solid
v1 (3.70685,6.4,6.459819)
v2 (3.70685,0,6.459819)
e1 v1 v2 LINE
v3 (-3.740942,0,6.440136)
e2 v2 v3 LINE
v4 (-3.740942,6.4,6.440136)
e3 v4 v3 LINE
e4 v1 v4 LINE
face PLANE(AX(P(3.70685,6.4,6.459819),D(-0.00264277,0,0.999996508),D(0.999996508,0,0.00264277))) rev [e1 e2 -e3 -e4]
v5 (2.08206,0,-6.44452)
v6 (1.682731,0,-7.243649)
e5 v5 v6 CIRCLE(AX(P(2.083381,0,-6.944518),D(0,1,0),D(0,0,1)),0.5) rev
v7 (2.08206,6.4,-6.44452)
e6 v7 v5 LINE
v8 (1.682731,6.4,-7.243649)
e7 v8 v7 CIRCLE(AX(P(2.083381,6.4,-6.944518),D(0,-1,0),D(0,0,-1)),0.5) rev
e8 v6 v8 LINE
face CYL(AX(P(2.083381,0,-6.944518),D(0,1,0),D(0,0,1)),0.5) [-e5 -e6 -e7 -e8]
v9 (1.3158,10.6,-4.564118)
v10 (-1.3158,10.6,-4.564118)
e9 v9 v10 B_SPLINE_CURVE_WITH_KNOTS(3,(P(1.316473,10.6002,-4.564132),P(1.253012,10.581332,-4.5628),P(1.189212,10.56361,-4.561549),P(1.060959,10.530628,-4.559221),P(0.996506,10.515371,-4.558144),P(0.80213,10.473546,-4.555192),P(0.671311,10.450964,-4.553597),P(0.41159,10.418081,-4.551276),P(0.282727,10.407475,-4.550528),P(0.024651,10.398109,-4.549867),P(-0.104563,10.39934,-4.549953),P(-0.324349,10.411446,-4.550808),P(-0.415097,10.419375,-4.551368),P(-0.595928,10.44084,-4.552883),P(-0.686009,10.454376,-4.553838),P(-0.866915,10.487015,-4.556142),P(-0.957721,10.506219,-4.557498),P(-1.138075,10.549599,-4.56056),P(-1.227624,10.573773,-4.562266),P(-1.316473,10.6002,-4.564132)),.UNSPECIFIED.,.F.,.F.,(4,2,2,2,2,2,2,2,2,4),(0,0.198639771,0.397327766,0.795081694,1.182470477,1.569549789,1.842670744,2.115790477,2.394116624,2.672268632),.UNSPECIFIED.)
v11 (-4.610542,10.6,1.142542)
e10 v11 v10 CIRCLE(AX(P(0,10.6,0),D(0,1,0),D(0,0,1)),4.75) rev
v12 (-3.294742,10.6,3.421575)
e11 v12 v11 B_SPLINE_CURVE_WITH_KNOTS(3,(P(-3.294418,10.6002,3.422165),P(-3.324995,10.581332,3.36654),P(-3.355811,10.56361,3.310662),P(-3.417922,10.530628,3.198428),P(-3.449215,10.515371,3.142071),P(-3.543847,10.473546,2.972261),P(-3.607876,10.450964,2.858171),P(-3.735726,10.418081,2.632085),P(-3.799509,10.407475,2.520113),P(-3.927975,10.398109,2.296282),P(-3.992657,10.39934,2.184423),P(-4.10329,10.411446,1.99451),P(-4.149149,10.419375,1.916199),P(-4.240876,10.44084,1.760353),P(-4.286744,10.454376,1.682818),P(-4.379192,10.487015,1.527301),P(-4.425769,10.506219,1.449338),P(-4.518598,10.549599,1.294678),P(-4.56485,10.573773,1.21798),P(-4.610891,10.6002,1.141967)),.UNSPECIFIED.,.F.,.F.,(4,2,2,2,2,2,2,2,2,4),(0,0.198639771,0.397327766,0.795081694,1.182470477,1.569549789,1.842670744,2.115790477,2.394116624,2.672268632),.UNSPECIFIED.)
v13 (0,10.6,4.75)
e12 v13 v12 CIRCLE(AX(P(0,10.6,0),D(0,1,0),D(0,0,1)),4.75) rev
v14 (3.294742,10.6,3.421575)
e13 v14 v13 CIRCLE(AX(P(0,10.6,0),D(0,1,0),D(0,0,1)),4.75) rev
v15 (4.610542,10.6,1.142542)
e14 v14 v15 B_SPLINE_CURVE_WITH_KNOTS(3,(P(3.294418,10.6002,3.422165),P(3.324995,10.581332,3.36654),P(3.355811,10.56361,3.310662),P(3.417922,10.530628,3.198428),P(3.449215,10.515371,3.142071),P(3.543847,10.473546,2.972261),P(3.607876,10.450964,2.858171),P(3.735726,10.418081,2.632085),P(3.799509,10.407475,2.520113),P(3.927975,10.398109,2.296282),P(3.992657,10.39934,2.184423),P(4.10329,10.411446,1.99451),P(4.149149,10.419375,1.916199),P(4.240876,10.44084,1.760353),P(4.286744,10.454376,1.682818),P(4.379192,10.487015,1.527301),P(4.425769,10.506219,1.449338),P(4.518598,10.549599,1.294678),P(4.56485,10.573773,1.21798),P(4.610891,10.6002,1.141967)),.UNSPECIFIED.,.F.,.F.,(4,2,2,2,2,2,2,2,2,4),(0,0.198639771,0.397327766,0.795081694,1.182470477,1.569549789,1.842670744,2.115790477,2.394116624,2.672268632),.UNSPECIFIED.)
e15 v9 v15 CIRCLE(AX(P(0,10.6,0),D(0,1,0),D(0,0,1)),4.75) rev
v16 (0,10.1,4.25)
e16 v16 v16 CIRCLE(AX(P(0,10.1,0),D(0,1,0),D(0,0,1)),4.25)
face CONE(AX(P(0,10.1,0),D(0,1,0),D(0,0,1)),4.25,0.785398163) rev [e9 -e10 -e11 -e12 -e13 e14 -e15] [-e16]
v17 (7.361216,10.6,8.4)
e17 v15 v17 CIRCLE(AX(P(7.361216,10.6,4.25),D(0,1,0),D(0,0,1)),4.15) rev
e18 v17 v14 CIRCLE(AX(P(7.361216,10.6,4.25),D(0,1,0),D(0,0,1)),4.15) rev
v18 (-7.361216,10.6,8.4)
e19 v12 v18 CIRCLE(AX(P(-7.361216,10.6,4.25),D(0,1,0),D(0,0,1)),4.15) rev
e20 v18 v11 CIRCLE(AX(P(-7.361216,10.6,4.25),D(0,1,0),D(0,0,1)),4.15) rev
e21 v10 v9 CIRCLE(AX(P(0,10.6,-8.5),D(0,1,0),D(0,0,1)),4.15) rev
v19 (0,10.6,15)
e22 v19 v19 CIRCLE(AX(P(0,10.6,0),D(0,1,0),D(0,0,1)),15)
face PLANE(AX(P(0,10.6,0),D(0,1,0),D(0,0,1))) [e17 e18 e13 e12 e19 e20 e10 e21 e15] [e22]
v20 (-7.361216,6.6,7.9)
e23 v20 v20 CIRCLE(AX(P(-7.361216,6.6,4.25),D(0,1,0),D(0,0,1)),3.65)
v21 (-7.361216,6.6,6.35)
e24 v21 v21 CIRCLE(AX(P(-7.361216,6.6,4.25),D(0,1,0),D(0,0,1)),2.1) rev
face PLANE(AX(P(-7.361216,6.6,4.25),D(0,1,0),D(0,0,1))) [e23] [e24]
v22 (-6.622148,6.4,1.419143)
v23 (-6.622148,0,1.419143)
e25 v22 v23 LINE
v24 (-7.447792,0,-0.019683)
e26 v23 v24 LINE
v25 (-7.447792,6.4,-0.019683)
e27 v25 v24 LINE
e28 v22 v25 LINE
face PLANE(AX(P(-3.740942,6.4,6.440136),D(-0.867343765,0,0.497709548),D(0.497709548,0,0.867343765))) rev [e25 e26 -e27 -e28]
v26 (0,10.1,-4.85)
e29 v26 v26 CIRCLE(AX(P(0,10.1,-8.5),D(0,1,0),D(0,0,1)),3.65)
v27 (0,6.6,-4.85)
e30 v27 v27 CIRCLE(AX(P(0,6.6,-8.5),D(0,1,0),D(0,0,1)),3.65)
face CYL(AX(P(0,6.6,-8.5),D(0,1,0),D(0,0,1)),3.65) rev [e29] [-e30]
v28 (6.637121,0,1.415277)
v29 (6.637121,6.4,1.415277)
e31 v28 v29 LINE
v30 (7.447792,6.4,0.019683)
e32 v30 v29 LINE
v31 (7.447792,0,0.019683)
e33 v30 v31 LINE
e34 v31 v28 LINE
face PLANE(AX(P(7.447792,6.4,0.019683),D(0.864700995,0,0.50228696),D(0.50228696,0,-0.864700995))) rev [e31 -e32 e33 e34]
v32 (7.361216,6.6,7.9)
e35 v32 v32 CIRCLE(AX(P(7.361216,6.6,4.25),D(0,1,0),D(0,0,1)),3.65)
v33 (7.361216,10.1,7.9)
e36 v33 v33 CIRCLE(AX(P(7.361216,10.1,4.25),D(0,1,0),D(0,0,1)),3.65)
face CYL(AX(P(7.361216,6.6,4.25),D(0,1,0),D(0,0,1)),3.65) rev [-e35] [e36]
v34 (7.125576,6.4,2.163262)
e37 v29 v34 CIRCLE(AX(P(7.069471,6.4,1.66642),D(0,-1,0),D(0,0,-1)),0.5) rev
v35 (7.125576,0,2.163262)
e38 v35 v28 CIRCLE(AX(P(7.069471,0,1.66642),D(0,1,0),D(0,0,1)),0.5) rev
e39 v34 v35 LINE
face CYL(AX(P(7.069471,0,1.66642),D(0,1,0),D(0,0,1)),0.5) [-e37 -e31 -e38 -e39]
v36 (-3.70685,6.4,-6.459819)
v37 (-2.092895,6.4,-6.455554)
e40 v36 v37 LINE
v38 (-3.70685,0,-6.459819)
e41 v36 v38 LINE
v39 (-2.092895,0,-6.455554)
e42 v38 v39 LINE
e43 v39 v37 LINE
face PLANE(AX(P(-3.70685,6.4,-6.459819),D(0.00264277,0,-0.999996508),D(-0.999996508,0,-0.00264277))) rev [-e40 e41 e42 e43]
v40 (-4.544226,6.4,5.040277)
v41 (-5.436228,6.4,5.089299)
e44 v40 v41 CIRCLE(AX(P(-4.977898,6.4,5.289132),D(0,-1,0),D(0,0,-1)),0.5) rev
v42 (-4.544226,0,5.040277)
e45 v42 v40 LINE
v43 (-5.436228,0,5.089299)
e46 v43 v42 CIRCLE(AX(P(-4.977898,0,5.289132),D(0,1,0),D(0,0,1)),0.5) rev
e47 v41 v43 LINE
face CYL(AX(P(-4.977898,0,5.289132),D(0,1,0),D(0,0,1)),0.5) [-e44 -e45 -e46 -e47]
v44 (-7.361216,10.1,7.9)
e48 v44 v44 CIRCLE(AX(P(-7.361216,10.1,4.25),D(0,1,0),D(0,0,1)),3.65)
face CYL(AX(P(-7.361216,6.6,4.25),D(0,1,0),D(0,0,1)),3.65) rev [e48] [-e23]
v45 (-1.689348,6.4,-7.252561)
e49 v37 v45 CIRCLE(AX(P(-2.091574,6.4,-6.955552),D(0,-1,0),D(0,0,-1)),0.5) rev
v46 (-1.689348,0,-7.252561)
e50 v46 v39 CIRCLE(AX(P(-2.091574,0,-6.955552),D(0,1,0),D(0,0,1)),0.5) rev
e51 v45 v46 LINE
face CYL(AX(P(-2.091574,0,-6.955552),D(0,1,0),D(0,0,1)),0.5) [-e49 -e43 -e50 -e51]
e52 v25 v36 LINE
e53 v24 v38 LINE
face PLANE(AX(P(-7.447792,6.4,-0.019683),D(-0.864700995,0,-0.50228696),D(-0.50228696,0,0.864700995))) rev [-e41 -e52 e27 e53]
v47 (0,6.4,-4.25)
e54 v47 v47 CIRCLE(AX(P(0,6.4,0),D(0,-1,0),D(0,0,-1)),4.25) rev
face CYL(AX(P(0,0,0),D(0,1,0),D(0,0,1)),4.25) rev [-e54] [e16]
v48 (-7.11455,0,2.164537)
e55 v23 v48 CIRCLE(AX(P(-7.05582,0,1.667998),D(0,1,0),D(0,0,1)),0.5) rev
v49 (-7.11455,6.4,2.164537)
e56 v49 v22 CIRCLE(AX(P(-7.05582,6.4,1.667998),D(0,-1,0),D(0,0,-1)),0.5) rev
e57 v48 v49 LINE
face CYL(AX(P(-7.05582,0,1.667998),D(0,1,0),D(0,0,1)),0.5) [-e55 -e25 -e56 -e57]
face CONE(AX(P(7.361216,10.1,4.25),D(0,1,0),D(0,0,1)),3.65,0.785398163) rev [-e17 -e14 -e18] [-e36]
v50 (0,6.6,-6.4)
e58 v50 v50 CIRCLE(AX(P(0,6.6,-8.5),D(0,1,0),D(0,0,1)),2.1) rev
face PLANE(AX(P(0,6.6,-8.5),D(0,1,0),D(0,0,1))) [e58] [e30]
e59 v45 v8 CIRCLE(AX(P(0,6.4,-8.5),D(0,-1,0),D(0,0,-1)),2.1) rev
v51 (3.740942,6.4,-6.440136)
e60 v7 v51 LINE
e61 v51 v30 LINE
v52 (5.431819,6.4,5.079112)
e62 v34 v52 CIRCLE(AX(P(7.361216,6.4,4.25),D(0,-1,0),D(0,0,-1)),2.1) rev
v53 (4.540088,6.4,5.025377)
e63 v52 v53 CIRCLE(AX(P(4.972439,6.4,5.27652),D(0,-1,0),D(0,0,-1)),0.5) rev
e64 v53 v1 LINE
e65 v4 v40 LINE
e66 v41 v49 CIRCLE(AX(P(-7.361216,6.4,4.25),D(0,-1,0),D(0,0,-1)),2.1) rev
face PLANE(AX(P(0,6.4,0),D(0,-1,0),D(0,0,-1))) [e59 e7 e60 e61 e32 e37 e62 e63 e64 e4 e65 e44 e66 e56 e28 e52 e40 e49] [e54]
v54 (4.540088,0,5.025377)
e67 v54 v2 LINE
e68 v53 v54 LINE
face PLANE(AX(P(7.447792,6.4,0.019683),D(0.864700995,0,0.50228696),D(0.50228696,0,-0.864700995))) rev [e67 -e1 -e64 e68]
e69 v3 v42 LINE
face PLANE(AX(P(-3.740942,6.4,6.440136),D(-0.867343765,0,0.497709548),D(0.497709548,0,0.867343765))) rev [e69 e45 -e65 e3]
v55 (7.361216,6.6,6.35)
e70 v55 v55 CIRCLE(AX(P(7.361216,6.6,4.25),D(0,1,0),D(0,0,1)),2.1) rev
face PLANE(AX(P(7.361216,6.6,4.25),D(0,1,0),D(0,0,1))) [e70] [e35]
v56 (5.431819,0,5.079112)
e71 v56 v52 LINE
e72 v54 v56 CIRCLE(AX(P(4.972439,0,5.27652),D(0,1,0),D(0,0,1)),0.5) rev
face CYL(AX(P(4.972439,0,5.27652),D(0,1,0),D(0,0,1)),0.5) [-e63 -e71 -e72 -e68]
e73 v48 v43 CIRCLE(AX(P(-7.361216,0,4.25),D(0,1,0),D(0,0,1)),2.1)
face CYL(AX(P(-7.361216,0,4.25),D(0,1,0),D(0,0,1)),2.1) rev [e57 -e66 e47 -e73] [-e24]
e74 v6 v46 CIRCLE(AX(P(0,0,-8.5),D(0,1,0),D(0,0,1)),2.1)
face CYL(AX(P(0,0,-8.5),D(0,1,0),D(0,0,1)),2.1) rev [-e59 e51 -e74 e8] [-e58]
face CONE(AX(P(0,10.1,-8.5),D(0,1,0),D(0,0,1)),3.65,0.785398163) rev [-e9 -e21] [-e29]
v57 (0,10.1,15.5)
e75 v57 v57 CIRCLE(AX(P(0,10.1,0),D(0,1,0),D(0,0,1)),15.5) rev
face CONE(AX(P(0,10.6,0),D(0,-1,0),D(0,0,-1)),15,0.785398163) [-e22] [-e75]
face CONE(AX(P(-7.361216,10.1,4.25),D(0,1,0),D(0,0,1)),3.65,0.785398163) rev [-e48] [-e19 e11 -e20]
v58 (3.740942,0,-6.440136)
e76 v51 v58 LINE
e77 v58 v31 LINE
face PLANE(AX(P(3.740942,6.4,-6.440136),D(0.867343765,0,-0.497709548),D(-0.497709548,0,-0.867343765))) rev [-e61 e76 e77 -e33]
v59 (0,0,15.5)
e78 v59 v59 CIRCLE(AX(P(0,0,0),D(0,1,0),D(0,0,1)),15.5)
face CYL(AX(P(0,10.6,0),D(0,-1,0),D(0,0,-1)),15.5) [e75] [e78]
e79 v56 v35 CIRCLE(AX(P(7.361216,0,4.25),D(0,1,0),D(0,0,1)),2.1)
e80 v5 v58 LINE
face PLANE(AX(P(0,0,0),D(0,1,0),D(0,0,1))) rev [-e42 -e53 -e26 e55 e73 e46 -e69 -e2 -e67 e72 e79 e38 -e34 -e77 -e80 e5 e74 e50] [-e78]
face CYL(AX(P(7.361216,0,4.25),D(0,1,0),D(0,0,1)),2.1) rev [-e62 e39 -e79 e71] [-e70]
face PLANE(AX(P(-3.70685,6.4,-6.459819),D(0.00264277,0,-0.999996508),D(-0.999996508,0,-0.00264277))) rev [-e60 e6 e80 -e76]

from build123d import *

# Parameters (mm, degrees)
SKETCH1_R           = 15.5
BOSS_EXTRUDE1_DEPTH = 10.6
SKETCH2_R           = 2.1
CUT_EXTRUDE1_DEPTH  = 25.348716599
SKETCH3_R           = 4.25
CUT_EXTRUDE2_DEPTH  = 25.348716599
CUT_EXTRUDE3_DEPTH  = 6.4
SKETCH5_R           = 3.65
CUT_EXTRUDE4_DEPTH  = 4
CHAMFER1_SIZE       = 0.5
FILLET_1_R          = 0.5


with BuildPart() as part:
    # Sketch1 → Boss-Extrude1 (new body)
    with BuildSketch(Plane(origin=(0, 0, 0), x_dir=(1, 0, 0), z_dir=(0, 1, 0))):
        with Locations(Location((0, 0, 0), (0, 0, 270))):
            Circle(SKETCH1_R)
    extrude(amount=BOSS_EXTRUDE1_DEPTH)

    # Sketch2 → Cut-Extrude1 (cut, through all)
    with BuildSketch(Plane(origin=(0, 10.6, 0), x_dir=(1, 0, 0), z_dir=(0, 1, 0))):
        with Locations(Location((0, 8.5, 0), (0, 0, 270))):
            Circle(SKETCH2_R)
        with Locations(Location((7.361215932, -4.25, 0), (0, 0, 270))):
            Circle(SKETCH2_R)
        with Locations(Location((-7.361215932, -4.25, 0), (0, 0, 270))):
            Circle(SKETCH2_R)
    extrude(amount=-CUT_EXTRUDE1_DEPTH, mode=Mode.SUBTRACT)

    # Sketch3 → Cut-Extrude2 (cut, through all)
    with BuildSketch(Plane(origin=(0, 10.6, 0), x_dir=(1, 0, 0), z_dir=(0, 1, 0))):
        with Locations(Location((0, 0, 0), (0, 0, 270))):
            Circle(SKETCH3_R)
    extrude(amount=-CUT_EXTRUDE2_DEPTH, mode=Mode.SUBTRACT)

    # Sketch4 → Cut-Extrude3 (cut)
    with BuildSketch(Plane.XZ):
        Polygon((3.740942098, -6.44013604), (7.447792464, 0.019682871), (3.706850366, 6.459818911), (-3.740942098, 6.44013604), (-7.447792464, -0.019682871), (-3.706850366, -6.459818911), align=None)
    extrude(amount=-CUT_EXTRUDE3_DEPTH, mode=Mode.SUBTRACT)

    # Sketch5 → Cut-Extrude4 (cut)
    with BuildSketch(Plane(origin=(0, 10.6, 0), x_dir=(1, 0, 0), z_dir=(0, 1, 0))):
        with Locations(Location((0, 8.5, 0), (0, 0, 270))):
            Circle(SKETCH5_R)
        with Locations(Location((7.361215932, -4.25, 0), (0, 0, 270))):
            Circle(SKETCH5_R)
        with Locations(Location((-7.361215932, -4.25, 0), (0, 0, 270))):
            Circle(SKETCH5_R)
    extrude(amount=-CUT_EXTRUDE4_DEPTH, mode=Mode.SUBTRACT)

    # Chamfer1
    # the kernel refuses this chamfer: 0.5 mm, written as the material it takes off along each edge
    with BuildSketch(Plane(origin=(0, 10.6, 0), x_dir=(0, 0, 1), z_dir=(-1, 0, 0))) as chamfer1_piece_1:
        Polygon((4.25 + CHAMFER1_SIZE, 0), (4.25, -CHAMFER1_SIZE), (4.25, 0), align=None)
    revolve(axis=Axis((0, 10.6, 0), (0, 1, 0)), mode=Mode.SUBTRACT)
    with BuildSketch(Plane(origin=(0, 10.6, 0), x_dir=(0, 0, 1), z_dir=(-1, 0, 0))) as chamfer1_piece_2:
        Polygon((15.5, -CHAMFER1_SIZE), (15.5 - CHAMFER1_SIZE, 0), (15.5, 0), align=None)
    revolve(axis=Axis((0, 10.6, 0), (0, 1, 0)), mode=Mode.SUBTRACT)
    with BuildSketch(Plane(origin=(0, 10.6, -8.5), x_dir=(0, 0, 1), z_dir=(-1, 0, 0))) as chamfer1_piece_3:
        Polygon((3.65 + CHAMFER1_SIZE, 0), (3.65, -CHAMFER1_SIZE), (3.65, 0), align=None)
    revolve(axis=Axis((0, 10.6, -8.5), (0, 1, 0)), mode=Mode.SUBTRACT)
    with BuildSketch(Plane(origin=(7.361215932, 10.6, 4.25), x_dir=(0, 0, 1), z_dir=(-1, 0, 0))) as chamfer1_piece_4:
        Polygon((3.65 + CHAMFER1_SIZE, 0), (3.65, -CHAMFER1_SIZE), (3.65, 0), align=None)
    revolve(axis=Axis((7.361215932, 10.6, 4.25), (0, 1, 0)), mode=Mode.SUBTRACT)
    with BuildSketch(Plane(origin=(-7.361215932, 10.6, 4.25), x_dir=(0, 0, 1), z_dir=(-1, 0, 0))) as chamfer1_piece_5:
        Polygon((3.65 + CHAMFER1_SIZE, 0), (3.65, -CHAMFER1_SIZE), (3.65, 0), align=None)
    revolve(axis=Axis((-7.361215932, 10.6, 4.25), (0, 1, 0)), mode=Mode.SUBTRACT)

    # Скругление1
    fillet_1_edges = [part.edges().sort_by_distance(p)[0] for p in [
        (5.359734874, 3.2, 3.614332183),
        (5.817474247, 3.2, 2.826321101),
        (-5.809970925, 3.2, 2.834500467),
        (-5.356402996, 3.2, 3.624919933),
        (0.450236051, 3.2, -6.44883265),
        (-0.461071251, 3.2, -6.451241034),
    ]]
    fillet(fillet_1_edges, radius=FILLET_1_R)


solid = part.part
